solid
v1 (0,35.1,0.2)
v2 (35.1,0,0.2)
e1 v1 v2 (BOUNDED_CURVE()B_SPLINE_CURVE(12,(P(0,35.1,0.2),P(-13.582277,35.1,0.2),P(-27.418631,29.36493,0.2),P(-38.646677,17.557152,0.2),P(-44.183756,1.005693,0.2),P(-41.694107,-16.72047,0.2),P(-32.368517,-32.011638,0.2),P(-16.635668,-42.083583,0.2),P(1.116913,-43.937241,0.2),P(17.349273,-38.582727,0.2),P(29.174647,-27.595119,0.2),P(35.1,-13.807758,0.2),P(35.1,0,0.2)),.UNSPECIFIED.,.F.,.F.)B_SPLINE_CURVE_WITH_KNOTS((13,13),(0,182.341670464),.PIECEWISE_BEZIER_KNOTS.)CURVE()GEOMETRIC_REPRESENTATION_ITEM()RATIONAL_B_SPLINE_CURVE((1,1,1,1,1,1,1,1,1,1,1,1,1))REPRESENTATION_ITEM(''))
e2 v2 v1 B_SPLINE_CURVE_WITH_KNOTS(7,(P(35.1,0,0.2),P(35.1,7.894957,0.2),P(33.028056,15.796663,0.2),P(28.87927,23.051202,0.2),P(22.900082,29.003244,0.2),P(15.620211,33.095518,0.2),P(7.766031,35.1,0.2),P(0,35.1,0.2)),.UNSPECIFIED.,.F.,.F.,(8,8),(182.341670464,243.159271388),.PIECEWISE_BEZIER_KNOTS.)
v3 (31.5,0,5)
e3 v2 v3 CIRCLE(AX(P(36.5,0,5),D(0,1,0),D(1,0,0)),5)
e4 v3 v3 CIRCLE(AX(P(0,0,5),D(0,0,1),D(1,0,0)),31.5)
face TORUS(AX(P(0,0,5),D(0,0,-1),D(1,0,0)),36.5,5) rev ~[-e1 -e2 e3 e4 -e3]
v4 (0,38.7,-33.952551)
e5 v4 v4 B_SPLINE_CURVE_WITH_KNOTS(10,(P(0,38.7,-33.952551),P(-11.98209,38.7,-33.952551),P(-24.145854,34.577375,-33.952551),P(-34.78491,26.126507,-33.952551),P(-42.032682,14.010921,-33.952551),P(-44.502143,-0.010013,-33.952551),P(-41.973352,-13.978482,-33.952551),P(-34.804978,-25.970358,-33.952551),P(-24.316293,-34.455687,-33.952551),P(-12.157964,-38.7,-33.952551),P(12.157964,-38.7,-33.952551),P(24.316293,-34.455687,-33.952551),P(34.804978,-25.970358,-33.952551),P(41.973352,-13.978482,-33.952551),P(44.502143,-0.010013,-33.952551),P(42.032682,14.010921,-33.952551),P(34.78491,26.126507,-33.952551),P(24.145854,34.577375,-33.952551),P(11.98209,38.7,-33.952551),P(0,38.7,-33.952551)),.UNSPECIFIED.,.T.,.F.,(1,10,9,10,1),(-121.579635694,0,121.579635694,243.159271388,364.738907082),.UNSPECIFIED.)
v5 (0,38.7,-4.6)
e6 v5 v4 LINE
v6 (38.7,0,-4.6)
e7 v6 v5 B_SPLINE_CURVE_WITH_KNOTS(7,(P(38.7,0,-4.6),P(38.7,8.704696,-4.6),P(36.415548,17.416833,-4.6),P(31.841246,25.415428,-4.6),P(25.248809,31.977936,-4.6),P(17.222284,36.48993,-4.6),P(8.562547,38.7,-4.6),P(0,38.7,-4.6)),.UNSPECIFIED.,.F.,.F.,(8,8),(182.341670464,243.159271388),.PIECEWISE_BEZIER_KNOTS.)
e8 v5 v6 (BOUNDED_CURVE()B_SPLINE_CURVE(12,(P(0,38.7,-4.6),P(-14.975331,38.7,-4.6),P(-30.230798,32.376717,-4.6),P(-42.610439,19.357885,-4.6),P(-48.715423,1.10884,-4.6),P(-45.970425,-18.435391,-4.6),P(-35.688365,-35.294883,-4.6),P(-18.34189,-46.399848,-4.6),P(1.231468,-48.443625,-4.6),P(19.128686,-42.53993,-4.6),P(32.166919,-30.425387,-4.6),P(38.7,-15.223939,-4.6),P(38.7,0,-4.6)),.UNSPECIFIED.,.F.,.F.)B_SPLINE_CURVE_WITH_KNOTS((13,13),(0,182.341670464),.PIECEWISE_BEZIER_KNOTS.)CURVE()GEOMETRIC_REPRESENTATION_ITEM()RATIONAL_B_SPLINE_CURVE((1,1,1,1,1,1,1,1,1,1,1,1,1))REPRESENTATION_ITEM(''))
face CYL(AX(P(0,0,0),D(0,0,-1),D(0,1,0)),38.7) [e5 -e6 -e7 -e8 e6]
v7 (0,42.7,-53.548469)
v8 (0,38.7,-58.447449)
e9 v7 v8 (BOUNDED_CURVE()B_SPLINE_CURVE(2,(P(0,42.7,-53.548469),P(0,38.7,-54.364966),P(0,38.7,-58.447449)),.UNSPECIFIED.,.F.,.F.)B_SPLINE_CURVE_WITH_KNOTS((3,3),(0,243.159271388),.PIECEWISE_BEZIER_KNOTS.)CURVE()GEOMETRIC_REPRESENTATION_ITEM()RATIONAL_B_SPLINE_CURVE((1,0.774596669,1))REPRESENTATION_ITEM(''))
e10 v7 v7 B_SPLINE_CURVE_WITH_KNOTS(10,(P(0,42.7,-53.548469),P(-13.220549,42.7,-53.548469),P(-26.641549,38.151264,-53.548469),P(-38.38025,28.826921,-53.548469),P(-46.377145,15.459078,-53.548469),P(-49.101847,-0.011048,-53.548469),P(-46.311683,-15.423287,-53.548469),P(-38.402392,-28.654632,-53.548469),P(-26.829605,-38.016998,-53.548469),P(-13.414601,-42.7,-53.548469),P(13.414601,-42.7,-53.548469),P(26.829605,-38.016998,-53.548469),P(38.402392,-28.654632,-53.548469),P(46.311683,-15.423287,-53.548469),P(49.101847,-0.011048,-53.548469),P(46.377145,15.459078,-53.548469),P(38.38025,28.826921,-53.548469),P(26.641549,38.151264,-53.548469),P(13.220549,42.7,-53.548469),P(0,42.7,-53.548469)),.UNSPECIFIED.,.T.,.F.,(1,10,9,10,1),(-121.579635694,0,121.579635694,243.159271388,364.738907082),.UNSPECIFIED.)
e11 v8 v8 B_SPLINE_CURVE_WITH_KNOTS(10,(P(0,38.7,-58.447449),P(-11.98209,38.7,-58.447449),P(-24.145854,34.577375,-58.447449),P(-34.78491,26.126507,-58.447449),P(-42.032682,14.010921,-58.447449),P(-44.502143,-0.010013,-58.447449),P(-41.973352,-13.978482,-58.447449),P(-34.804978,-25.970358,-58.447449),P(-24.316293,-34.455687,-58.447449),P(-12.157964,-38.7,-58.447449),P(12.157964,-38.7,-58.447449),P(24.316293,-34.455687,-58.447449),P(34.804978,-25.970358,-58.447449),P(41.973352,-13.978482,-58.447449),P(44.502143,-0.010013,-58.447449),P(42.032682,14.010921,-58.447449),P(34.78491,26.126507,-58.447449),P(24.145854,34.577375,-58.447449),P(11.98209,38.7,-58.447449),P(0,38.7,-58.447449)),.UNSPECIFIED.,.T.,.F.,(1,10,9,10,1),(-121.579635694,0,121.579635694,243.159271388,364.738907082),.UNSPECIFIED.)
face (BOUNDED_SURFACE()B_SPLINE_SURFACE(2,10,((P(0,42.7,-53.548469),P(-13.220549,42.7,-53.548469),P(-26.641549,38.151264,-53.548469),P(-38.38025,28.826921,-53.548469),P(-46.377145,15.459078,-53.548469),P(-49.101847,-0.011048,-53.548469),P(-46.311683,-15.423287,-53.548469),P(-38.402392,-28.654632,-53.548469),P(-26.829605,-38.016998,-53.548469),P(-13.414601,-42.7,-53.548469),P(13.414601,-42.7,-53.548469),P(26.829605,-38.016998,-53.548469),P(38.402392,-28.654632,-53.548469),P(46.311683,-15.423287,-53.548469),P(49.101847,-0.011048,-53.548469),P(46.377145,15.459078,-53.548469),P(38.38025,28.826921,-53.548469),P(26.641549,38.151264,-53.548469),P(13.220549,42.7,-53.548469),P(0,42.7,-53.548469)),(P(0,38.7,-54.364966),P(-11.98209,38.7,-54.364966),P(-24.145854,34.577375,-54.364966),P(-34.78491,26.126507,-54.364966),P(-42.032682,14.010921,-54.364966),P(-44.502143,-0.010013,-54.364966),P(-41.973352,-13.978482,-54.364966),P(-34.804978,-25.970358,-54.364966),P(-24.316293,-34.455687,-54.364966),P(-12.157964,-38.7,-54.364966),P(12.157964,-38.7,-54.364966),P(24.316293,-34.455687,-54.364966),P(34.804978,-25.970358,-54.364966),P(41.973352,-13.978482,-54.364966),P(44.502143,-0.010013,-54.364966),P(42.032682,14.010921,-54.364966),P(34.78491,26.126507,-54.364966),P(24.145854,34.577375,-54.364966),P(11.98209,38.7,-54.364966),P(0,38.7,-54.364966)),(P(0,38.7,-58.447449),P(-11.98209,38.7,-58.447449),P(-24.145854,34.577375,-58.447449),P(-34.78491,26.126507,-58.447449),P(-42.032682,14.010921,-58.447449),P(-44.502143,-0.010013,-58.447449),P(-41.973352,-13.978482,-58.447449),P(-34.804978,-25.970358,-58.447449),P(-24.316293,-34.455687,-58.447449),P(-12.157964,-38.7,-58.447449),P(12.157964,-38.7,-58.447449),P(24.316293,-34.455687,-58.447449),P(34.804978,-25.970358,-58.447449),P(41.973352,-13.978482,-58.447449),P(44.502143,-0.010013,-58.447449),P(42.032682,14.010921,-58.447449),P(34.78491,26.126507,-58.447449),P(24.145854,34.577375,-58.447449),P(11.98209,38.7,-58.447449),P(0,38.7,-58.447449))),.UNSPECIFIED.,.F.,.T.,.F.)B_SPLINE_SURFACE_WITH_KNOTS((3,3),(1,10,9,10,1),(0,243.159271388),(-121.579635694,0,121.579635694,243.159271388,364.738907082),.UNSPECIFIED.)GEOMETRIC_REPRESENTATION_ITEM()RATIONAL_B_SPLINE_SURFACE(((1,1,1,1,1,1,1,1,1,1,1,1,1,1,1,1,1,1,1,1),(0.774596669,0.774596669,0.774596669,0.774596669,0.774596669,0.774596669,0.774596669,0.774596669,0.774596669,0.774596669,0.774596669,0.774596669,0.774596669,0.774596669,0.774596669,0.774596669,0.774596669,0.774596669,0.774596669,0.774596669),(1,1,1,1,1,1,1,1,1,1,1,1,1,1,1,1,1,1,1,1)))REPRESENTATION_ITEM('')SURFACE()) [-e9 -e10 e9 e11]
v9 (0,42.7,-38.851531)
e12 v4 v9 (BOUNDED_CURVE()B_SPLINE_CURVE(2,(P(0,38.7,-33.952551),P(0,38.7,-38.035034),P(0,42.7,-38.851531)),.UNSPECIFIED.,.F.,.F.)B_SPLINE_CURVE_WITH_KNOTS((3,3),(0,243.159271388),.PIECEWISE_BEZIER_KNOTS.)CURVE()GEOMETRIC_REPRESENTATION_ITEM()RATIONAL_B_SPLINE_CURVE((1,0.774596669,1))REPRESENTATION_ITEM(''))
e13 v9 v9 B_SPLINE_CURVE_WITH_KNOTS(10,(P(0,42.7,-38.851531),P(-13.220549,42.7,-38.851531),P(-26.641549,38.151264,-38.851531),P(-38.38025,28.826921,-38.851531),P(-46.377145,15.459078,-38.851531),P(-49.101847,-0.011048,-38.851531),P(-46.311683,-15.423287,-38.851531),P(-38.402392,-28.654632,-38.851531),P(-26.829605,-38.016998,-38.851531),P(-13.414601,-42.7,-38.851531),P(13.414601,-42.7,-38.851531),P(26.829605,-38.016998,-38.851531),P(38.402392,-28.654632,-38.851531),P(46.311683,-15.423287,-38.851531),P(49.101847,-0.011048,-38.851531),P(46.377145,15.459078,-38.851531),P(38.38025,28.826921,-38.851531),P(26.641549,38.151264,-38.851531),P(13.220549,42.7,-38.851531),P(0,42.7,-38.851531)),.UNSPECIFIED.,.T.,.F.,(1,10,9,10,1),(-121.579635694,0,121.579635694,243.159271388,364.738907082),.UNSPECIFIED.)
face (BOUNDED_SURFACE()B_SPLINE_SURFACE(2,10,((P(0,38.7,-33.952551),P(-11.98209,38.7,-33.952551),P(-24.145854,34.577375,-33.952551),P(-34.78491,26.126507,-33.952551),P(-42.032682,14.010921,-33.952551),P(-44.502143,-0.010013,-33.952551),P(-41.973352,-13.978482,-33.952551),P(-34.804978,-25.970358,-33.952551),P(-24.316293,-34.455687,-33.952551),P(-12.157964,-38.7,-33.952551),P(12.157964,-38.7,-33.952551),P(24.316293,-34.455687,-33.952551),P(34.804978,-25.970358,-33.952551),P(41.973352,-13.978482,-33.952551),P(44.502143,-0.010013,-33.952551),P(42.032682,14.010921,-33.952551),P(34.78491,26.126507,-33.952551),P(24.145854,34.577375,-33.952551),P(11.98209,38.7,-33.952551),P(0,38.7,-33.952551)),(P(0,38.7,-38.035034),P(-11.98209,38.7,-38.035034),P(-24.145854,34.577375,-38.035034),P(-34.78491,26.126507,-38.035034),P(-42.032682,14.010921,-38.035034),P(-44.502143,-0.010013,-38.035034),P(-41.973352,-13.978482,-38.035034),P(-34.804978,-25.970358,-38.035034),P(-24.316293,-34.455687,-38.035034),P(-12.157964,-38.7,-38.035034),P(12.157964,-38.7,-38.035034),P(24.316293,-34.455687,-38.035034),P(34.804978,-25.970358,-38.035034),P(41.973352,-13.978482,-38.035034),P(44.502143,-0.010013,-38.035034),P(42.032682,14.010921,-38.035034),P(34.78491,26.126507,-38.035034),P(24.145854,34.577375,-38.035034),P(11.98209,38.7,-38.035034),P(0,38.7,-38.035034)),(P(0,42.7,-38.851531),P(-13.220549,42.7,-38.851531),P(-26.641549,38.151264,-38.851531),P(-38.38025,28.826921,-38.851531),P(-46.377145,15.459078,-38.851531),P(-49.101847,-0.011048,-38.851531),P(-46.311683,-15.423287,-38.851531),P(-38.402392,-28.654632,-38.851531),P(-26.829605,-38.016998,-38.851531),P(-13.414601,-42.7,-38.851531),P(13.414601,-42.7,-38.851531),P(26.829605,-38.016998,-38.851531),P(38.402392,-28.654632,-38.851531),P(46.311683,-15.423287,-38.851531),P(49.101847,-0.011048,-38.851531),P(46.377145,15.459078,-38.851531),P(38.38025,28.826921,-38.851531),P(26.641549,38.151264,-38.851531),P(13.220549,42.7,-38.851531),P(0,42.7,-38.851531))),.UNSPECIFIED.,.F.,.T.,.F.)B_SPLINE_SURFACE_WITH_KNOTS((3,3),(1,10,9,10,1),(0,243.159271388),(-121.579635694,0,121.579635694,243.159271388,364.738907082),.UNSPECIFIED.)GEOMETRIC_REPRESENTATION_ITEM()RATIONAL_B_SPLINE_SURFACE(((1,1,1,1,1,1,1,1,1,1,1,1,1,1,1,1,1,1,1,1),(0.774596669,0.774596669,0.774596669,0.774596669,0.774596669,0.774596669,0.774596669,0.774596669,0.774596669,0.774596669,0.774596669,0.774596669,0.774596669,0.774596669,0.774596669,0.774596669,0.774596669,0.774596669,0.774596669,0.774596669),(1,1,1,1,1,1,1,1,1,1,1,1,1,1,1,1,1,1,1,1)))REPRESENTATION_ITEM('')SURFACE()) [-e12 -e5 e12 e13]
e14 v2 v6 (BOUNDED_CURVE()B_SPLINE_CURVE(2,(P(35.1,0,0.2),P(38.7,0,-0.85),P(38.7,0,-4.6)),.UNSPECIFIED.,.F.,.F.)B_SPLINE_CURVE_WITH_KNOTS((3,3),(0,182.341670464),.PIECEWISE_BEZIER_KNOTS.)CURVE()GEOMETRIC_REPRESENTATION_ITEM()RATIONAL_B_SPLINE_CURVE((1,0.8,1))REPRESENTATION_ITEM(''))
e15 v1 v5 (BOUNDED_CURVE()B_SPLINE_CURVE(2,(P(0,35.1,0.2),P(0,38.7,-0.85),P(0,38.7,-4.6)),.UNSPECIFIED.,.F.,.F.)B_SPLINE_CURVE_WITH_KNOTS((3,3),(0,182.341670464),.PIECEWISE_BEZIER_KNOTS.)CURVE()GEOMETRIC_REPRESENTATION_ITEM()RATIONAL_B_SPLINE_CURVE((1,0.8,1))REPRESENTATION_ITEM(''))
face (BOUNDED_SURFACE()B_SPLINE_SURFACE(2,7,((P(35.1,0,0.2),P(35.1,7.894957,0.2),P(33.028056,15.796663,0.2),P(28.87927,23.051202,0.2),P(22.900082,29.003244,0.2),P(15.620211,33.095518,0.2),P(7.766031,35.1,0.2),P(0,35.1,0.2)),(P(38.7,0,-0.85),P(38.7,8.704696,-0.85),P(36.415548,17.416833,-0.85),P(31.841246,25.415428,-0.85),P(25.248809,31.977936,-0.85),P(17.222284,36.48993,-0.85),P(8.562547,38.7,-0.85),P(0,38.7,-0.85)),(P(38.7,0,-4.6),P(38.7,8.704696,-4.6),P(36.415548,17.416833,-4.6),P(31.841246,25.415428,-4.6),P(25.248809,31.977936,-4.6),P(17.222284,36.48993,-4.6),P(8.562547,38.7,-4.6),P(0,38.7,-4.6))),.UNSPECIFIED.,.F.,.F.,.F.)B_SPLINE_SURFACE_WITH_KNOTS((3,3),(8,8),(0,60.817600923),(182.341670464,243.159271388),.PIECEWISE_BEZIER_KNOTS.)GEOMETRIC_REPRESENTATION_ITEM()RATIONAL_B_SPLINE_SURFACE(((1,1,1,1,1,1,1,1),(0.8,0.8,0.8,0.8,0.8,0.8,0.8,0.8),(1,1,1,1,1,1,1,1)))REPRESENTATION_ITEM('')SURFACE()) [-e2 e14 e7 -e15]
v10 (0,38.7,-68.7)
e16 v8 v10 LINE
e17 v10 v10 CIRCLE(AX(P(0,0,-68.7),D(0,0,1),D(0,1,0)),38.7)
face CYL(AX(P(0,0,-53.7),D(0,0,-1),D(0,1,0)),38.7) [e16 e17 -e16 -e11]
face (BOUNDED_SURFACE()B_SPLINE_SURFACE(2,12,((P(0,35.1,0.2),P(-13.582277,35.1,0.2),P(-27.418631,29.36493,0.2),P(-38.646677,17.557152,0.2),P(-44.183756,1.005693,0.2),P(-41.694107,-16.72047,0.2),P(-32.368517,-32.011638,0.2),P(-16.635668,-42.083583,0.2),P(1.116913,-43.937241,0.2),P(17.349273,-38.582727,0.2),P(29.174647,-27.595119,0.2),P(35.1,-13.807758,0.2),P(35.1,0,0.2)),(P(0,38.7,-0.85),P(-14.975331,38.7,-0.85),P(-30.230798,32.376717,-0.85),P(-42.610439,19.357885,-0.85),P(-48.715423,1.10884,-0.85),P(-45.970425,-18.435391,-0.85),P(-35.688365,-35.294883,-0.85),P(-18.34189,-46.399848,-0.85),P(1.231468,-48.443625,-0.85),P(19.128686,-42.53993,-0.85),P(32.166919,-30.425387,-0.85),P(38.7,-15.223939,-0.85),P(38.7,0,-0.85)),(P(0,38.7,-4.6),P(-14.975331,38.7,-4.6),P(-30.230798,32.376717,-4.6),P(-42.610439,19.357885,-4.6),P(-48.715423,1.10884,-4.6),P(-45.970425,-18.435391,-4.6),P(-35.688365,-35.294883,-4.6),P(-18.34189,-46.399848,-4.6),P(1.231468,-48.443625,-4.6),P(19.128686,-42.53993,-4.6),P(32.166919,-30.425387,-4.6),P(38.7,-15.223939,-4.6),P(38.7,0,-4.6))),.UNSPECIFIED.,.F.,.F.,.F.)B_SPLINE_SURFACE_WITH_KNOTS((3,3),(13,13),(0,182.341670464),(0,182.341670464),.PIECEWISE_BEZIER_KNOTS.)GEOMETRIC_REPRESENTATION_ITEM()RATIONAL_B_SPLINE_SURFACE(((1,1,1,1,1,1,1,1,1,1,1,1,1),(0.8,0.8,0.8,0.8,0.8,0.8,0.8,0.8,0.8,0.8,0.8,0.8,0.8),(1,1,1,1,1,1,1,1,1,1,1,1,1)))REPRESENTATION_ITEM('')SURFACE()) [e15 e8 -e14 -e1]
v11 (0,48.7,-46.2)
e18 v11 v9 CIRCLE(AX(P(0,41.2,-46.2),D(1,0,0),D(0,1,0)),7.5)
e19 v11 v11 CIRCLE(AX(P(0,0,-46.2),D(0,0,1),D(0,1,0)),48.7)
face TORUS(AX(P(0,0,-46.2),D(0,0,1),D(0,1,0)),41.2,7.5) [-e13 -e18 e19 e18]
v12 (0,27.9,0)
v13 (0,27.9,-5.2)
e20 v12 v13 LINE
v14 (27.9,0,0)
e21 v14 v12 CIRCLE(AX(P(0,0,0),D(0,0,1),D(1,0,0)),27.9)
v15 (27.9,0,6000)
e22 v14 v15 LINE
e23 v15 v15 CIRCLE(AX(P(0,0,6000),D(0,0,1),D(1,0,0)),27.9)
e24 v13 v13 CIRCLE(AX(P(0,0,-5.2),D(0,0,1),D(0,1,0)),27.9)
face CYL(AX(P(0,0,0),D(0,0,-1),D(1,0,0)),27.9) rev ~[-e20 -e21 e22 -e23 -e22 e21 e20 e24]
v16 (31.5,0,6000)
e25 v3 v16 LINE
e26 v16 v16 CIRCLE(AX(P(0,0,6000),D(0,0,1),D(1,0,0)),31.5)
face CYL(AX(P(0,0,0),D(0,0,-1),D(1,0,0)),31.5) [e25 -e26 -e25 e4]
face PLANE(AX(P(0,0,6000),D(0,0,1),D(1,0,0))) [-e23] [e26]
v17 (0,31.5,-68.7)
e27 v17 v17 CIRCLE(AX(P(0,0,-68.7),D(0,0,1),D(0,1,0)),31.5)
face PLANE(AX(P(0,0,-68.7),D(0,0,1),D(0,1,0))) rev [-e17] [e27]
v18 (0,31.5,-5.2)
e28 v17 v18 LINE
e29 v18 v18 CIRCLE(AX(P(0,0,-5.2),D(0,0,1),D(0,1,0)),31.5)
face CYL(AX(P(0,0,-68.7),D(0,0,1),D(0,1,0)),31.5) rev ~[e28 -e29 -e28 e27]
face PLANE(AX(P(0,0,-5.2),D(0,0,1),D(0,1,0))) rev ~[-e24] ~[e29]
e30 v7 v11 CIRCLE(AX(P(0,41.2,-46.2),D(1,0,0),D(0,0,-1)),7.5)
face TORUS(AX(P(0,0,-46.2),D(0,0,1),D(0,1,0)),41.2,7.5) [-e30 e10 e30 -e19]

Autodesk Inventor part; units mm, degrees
ref_plane "YZ Plane" through (0, 0, 0) normal (1, 0, 0) x (0, 1, 0)
ref_plane "XZ Plane" through (0, 0, 0) normal (0, 1, 0) x (-1, 0, 0)
ref_plane "XY Plane" through (0, 0, 0) normal (0, 0, 1) x (1, 0, 0)
sketch "Sketch1" plane through (0, 0, 0) normal (0, 0, 1) x (1, 0, 0)
  circle A0 centre (0, 0) radius 31.5
  circle A1 centre (0, 0) radius 27.9
  dimension "d0" = 63
  dimension "d1" = 3.6
extrude "Extrusion1" add sketch "Sketch1" along normal blind 6000
sketch "Sketch2" plane through (0, 0, 0) normal (1, 0, 0) x (0, 1, 0)
  line L0 (27.9, 0) -> (38.7, 0)
  line L1 (38.7, 0) -> (38.7, -38.7)
  line L2 (48.7, -46.2) -> (48.7, -46.2)
  line L3 (38.7, -53.7) -> (38.7, -68.7)
  arc A0 (48.7, -46.2) -> (41.2, -38.7) centre (41.2, -46.2) ccw
  arc A1 (41.2, -53.7) -> (48.7, -46.2) centre (41.2, -46.2) ccw
  line L4 (41.2, -38.7) -> (38.7, -38.7)
  line L5 (41.2, -53.7) -> (38.7, -53.7)
  line L6 (31.5, 6000) -> (-31.5, 6000) projected
  line L7 (-31.5, 0) -> (31.5, 0) projected
  line L8 (27.9, 0) -> (27.9, -5.2)
  line L9 (0, -1282.44) -> (0, 7213.74) projected
  line L10 (31.5, -68.7) -> (31.5, -5.2)
  line L11 (31.5, -5.2) -> (27.9, -5.2)
  line L12 (31.5, -68.7) -> (38.7, -68.7)
  point P0 (0, 0)
  point P1 (48.7, -53.7)
  point P2 (48.7, -38.7)
  dimension "d4" = 38.7
  dimension "d6" = 15
  dimension "d7" = 10
  dimension "d8" = 15
  dimension "d9" = 7.5
  dimension "d12" = 3.6
  dimension "d13" = 63.5
revolve "Revolution1" add sketch "Sketch2" angle 360 about axis through (0, 0, -10) along (0, 0, 1)
fillet "Fillet4" radius 5 2 edges at (0, -38.7, -53.7) (0, -38.7, -38.7)
fillet "Fillet5" radius 5 2 edges at (-31.5, 0, 0) (0, -38.7, 0)
properties part number "6m_GENERIC_FLAT"
